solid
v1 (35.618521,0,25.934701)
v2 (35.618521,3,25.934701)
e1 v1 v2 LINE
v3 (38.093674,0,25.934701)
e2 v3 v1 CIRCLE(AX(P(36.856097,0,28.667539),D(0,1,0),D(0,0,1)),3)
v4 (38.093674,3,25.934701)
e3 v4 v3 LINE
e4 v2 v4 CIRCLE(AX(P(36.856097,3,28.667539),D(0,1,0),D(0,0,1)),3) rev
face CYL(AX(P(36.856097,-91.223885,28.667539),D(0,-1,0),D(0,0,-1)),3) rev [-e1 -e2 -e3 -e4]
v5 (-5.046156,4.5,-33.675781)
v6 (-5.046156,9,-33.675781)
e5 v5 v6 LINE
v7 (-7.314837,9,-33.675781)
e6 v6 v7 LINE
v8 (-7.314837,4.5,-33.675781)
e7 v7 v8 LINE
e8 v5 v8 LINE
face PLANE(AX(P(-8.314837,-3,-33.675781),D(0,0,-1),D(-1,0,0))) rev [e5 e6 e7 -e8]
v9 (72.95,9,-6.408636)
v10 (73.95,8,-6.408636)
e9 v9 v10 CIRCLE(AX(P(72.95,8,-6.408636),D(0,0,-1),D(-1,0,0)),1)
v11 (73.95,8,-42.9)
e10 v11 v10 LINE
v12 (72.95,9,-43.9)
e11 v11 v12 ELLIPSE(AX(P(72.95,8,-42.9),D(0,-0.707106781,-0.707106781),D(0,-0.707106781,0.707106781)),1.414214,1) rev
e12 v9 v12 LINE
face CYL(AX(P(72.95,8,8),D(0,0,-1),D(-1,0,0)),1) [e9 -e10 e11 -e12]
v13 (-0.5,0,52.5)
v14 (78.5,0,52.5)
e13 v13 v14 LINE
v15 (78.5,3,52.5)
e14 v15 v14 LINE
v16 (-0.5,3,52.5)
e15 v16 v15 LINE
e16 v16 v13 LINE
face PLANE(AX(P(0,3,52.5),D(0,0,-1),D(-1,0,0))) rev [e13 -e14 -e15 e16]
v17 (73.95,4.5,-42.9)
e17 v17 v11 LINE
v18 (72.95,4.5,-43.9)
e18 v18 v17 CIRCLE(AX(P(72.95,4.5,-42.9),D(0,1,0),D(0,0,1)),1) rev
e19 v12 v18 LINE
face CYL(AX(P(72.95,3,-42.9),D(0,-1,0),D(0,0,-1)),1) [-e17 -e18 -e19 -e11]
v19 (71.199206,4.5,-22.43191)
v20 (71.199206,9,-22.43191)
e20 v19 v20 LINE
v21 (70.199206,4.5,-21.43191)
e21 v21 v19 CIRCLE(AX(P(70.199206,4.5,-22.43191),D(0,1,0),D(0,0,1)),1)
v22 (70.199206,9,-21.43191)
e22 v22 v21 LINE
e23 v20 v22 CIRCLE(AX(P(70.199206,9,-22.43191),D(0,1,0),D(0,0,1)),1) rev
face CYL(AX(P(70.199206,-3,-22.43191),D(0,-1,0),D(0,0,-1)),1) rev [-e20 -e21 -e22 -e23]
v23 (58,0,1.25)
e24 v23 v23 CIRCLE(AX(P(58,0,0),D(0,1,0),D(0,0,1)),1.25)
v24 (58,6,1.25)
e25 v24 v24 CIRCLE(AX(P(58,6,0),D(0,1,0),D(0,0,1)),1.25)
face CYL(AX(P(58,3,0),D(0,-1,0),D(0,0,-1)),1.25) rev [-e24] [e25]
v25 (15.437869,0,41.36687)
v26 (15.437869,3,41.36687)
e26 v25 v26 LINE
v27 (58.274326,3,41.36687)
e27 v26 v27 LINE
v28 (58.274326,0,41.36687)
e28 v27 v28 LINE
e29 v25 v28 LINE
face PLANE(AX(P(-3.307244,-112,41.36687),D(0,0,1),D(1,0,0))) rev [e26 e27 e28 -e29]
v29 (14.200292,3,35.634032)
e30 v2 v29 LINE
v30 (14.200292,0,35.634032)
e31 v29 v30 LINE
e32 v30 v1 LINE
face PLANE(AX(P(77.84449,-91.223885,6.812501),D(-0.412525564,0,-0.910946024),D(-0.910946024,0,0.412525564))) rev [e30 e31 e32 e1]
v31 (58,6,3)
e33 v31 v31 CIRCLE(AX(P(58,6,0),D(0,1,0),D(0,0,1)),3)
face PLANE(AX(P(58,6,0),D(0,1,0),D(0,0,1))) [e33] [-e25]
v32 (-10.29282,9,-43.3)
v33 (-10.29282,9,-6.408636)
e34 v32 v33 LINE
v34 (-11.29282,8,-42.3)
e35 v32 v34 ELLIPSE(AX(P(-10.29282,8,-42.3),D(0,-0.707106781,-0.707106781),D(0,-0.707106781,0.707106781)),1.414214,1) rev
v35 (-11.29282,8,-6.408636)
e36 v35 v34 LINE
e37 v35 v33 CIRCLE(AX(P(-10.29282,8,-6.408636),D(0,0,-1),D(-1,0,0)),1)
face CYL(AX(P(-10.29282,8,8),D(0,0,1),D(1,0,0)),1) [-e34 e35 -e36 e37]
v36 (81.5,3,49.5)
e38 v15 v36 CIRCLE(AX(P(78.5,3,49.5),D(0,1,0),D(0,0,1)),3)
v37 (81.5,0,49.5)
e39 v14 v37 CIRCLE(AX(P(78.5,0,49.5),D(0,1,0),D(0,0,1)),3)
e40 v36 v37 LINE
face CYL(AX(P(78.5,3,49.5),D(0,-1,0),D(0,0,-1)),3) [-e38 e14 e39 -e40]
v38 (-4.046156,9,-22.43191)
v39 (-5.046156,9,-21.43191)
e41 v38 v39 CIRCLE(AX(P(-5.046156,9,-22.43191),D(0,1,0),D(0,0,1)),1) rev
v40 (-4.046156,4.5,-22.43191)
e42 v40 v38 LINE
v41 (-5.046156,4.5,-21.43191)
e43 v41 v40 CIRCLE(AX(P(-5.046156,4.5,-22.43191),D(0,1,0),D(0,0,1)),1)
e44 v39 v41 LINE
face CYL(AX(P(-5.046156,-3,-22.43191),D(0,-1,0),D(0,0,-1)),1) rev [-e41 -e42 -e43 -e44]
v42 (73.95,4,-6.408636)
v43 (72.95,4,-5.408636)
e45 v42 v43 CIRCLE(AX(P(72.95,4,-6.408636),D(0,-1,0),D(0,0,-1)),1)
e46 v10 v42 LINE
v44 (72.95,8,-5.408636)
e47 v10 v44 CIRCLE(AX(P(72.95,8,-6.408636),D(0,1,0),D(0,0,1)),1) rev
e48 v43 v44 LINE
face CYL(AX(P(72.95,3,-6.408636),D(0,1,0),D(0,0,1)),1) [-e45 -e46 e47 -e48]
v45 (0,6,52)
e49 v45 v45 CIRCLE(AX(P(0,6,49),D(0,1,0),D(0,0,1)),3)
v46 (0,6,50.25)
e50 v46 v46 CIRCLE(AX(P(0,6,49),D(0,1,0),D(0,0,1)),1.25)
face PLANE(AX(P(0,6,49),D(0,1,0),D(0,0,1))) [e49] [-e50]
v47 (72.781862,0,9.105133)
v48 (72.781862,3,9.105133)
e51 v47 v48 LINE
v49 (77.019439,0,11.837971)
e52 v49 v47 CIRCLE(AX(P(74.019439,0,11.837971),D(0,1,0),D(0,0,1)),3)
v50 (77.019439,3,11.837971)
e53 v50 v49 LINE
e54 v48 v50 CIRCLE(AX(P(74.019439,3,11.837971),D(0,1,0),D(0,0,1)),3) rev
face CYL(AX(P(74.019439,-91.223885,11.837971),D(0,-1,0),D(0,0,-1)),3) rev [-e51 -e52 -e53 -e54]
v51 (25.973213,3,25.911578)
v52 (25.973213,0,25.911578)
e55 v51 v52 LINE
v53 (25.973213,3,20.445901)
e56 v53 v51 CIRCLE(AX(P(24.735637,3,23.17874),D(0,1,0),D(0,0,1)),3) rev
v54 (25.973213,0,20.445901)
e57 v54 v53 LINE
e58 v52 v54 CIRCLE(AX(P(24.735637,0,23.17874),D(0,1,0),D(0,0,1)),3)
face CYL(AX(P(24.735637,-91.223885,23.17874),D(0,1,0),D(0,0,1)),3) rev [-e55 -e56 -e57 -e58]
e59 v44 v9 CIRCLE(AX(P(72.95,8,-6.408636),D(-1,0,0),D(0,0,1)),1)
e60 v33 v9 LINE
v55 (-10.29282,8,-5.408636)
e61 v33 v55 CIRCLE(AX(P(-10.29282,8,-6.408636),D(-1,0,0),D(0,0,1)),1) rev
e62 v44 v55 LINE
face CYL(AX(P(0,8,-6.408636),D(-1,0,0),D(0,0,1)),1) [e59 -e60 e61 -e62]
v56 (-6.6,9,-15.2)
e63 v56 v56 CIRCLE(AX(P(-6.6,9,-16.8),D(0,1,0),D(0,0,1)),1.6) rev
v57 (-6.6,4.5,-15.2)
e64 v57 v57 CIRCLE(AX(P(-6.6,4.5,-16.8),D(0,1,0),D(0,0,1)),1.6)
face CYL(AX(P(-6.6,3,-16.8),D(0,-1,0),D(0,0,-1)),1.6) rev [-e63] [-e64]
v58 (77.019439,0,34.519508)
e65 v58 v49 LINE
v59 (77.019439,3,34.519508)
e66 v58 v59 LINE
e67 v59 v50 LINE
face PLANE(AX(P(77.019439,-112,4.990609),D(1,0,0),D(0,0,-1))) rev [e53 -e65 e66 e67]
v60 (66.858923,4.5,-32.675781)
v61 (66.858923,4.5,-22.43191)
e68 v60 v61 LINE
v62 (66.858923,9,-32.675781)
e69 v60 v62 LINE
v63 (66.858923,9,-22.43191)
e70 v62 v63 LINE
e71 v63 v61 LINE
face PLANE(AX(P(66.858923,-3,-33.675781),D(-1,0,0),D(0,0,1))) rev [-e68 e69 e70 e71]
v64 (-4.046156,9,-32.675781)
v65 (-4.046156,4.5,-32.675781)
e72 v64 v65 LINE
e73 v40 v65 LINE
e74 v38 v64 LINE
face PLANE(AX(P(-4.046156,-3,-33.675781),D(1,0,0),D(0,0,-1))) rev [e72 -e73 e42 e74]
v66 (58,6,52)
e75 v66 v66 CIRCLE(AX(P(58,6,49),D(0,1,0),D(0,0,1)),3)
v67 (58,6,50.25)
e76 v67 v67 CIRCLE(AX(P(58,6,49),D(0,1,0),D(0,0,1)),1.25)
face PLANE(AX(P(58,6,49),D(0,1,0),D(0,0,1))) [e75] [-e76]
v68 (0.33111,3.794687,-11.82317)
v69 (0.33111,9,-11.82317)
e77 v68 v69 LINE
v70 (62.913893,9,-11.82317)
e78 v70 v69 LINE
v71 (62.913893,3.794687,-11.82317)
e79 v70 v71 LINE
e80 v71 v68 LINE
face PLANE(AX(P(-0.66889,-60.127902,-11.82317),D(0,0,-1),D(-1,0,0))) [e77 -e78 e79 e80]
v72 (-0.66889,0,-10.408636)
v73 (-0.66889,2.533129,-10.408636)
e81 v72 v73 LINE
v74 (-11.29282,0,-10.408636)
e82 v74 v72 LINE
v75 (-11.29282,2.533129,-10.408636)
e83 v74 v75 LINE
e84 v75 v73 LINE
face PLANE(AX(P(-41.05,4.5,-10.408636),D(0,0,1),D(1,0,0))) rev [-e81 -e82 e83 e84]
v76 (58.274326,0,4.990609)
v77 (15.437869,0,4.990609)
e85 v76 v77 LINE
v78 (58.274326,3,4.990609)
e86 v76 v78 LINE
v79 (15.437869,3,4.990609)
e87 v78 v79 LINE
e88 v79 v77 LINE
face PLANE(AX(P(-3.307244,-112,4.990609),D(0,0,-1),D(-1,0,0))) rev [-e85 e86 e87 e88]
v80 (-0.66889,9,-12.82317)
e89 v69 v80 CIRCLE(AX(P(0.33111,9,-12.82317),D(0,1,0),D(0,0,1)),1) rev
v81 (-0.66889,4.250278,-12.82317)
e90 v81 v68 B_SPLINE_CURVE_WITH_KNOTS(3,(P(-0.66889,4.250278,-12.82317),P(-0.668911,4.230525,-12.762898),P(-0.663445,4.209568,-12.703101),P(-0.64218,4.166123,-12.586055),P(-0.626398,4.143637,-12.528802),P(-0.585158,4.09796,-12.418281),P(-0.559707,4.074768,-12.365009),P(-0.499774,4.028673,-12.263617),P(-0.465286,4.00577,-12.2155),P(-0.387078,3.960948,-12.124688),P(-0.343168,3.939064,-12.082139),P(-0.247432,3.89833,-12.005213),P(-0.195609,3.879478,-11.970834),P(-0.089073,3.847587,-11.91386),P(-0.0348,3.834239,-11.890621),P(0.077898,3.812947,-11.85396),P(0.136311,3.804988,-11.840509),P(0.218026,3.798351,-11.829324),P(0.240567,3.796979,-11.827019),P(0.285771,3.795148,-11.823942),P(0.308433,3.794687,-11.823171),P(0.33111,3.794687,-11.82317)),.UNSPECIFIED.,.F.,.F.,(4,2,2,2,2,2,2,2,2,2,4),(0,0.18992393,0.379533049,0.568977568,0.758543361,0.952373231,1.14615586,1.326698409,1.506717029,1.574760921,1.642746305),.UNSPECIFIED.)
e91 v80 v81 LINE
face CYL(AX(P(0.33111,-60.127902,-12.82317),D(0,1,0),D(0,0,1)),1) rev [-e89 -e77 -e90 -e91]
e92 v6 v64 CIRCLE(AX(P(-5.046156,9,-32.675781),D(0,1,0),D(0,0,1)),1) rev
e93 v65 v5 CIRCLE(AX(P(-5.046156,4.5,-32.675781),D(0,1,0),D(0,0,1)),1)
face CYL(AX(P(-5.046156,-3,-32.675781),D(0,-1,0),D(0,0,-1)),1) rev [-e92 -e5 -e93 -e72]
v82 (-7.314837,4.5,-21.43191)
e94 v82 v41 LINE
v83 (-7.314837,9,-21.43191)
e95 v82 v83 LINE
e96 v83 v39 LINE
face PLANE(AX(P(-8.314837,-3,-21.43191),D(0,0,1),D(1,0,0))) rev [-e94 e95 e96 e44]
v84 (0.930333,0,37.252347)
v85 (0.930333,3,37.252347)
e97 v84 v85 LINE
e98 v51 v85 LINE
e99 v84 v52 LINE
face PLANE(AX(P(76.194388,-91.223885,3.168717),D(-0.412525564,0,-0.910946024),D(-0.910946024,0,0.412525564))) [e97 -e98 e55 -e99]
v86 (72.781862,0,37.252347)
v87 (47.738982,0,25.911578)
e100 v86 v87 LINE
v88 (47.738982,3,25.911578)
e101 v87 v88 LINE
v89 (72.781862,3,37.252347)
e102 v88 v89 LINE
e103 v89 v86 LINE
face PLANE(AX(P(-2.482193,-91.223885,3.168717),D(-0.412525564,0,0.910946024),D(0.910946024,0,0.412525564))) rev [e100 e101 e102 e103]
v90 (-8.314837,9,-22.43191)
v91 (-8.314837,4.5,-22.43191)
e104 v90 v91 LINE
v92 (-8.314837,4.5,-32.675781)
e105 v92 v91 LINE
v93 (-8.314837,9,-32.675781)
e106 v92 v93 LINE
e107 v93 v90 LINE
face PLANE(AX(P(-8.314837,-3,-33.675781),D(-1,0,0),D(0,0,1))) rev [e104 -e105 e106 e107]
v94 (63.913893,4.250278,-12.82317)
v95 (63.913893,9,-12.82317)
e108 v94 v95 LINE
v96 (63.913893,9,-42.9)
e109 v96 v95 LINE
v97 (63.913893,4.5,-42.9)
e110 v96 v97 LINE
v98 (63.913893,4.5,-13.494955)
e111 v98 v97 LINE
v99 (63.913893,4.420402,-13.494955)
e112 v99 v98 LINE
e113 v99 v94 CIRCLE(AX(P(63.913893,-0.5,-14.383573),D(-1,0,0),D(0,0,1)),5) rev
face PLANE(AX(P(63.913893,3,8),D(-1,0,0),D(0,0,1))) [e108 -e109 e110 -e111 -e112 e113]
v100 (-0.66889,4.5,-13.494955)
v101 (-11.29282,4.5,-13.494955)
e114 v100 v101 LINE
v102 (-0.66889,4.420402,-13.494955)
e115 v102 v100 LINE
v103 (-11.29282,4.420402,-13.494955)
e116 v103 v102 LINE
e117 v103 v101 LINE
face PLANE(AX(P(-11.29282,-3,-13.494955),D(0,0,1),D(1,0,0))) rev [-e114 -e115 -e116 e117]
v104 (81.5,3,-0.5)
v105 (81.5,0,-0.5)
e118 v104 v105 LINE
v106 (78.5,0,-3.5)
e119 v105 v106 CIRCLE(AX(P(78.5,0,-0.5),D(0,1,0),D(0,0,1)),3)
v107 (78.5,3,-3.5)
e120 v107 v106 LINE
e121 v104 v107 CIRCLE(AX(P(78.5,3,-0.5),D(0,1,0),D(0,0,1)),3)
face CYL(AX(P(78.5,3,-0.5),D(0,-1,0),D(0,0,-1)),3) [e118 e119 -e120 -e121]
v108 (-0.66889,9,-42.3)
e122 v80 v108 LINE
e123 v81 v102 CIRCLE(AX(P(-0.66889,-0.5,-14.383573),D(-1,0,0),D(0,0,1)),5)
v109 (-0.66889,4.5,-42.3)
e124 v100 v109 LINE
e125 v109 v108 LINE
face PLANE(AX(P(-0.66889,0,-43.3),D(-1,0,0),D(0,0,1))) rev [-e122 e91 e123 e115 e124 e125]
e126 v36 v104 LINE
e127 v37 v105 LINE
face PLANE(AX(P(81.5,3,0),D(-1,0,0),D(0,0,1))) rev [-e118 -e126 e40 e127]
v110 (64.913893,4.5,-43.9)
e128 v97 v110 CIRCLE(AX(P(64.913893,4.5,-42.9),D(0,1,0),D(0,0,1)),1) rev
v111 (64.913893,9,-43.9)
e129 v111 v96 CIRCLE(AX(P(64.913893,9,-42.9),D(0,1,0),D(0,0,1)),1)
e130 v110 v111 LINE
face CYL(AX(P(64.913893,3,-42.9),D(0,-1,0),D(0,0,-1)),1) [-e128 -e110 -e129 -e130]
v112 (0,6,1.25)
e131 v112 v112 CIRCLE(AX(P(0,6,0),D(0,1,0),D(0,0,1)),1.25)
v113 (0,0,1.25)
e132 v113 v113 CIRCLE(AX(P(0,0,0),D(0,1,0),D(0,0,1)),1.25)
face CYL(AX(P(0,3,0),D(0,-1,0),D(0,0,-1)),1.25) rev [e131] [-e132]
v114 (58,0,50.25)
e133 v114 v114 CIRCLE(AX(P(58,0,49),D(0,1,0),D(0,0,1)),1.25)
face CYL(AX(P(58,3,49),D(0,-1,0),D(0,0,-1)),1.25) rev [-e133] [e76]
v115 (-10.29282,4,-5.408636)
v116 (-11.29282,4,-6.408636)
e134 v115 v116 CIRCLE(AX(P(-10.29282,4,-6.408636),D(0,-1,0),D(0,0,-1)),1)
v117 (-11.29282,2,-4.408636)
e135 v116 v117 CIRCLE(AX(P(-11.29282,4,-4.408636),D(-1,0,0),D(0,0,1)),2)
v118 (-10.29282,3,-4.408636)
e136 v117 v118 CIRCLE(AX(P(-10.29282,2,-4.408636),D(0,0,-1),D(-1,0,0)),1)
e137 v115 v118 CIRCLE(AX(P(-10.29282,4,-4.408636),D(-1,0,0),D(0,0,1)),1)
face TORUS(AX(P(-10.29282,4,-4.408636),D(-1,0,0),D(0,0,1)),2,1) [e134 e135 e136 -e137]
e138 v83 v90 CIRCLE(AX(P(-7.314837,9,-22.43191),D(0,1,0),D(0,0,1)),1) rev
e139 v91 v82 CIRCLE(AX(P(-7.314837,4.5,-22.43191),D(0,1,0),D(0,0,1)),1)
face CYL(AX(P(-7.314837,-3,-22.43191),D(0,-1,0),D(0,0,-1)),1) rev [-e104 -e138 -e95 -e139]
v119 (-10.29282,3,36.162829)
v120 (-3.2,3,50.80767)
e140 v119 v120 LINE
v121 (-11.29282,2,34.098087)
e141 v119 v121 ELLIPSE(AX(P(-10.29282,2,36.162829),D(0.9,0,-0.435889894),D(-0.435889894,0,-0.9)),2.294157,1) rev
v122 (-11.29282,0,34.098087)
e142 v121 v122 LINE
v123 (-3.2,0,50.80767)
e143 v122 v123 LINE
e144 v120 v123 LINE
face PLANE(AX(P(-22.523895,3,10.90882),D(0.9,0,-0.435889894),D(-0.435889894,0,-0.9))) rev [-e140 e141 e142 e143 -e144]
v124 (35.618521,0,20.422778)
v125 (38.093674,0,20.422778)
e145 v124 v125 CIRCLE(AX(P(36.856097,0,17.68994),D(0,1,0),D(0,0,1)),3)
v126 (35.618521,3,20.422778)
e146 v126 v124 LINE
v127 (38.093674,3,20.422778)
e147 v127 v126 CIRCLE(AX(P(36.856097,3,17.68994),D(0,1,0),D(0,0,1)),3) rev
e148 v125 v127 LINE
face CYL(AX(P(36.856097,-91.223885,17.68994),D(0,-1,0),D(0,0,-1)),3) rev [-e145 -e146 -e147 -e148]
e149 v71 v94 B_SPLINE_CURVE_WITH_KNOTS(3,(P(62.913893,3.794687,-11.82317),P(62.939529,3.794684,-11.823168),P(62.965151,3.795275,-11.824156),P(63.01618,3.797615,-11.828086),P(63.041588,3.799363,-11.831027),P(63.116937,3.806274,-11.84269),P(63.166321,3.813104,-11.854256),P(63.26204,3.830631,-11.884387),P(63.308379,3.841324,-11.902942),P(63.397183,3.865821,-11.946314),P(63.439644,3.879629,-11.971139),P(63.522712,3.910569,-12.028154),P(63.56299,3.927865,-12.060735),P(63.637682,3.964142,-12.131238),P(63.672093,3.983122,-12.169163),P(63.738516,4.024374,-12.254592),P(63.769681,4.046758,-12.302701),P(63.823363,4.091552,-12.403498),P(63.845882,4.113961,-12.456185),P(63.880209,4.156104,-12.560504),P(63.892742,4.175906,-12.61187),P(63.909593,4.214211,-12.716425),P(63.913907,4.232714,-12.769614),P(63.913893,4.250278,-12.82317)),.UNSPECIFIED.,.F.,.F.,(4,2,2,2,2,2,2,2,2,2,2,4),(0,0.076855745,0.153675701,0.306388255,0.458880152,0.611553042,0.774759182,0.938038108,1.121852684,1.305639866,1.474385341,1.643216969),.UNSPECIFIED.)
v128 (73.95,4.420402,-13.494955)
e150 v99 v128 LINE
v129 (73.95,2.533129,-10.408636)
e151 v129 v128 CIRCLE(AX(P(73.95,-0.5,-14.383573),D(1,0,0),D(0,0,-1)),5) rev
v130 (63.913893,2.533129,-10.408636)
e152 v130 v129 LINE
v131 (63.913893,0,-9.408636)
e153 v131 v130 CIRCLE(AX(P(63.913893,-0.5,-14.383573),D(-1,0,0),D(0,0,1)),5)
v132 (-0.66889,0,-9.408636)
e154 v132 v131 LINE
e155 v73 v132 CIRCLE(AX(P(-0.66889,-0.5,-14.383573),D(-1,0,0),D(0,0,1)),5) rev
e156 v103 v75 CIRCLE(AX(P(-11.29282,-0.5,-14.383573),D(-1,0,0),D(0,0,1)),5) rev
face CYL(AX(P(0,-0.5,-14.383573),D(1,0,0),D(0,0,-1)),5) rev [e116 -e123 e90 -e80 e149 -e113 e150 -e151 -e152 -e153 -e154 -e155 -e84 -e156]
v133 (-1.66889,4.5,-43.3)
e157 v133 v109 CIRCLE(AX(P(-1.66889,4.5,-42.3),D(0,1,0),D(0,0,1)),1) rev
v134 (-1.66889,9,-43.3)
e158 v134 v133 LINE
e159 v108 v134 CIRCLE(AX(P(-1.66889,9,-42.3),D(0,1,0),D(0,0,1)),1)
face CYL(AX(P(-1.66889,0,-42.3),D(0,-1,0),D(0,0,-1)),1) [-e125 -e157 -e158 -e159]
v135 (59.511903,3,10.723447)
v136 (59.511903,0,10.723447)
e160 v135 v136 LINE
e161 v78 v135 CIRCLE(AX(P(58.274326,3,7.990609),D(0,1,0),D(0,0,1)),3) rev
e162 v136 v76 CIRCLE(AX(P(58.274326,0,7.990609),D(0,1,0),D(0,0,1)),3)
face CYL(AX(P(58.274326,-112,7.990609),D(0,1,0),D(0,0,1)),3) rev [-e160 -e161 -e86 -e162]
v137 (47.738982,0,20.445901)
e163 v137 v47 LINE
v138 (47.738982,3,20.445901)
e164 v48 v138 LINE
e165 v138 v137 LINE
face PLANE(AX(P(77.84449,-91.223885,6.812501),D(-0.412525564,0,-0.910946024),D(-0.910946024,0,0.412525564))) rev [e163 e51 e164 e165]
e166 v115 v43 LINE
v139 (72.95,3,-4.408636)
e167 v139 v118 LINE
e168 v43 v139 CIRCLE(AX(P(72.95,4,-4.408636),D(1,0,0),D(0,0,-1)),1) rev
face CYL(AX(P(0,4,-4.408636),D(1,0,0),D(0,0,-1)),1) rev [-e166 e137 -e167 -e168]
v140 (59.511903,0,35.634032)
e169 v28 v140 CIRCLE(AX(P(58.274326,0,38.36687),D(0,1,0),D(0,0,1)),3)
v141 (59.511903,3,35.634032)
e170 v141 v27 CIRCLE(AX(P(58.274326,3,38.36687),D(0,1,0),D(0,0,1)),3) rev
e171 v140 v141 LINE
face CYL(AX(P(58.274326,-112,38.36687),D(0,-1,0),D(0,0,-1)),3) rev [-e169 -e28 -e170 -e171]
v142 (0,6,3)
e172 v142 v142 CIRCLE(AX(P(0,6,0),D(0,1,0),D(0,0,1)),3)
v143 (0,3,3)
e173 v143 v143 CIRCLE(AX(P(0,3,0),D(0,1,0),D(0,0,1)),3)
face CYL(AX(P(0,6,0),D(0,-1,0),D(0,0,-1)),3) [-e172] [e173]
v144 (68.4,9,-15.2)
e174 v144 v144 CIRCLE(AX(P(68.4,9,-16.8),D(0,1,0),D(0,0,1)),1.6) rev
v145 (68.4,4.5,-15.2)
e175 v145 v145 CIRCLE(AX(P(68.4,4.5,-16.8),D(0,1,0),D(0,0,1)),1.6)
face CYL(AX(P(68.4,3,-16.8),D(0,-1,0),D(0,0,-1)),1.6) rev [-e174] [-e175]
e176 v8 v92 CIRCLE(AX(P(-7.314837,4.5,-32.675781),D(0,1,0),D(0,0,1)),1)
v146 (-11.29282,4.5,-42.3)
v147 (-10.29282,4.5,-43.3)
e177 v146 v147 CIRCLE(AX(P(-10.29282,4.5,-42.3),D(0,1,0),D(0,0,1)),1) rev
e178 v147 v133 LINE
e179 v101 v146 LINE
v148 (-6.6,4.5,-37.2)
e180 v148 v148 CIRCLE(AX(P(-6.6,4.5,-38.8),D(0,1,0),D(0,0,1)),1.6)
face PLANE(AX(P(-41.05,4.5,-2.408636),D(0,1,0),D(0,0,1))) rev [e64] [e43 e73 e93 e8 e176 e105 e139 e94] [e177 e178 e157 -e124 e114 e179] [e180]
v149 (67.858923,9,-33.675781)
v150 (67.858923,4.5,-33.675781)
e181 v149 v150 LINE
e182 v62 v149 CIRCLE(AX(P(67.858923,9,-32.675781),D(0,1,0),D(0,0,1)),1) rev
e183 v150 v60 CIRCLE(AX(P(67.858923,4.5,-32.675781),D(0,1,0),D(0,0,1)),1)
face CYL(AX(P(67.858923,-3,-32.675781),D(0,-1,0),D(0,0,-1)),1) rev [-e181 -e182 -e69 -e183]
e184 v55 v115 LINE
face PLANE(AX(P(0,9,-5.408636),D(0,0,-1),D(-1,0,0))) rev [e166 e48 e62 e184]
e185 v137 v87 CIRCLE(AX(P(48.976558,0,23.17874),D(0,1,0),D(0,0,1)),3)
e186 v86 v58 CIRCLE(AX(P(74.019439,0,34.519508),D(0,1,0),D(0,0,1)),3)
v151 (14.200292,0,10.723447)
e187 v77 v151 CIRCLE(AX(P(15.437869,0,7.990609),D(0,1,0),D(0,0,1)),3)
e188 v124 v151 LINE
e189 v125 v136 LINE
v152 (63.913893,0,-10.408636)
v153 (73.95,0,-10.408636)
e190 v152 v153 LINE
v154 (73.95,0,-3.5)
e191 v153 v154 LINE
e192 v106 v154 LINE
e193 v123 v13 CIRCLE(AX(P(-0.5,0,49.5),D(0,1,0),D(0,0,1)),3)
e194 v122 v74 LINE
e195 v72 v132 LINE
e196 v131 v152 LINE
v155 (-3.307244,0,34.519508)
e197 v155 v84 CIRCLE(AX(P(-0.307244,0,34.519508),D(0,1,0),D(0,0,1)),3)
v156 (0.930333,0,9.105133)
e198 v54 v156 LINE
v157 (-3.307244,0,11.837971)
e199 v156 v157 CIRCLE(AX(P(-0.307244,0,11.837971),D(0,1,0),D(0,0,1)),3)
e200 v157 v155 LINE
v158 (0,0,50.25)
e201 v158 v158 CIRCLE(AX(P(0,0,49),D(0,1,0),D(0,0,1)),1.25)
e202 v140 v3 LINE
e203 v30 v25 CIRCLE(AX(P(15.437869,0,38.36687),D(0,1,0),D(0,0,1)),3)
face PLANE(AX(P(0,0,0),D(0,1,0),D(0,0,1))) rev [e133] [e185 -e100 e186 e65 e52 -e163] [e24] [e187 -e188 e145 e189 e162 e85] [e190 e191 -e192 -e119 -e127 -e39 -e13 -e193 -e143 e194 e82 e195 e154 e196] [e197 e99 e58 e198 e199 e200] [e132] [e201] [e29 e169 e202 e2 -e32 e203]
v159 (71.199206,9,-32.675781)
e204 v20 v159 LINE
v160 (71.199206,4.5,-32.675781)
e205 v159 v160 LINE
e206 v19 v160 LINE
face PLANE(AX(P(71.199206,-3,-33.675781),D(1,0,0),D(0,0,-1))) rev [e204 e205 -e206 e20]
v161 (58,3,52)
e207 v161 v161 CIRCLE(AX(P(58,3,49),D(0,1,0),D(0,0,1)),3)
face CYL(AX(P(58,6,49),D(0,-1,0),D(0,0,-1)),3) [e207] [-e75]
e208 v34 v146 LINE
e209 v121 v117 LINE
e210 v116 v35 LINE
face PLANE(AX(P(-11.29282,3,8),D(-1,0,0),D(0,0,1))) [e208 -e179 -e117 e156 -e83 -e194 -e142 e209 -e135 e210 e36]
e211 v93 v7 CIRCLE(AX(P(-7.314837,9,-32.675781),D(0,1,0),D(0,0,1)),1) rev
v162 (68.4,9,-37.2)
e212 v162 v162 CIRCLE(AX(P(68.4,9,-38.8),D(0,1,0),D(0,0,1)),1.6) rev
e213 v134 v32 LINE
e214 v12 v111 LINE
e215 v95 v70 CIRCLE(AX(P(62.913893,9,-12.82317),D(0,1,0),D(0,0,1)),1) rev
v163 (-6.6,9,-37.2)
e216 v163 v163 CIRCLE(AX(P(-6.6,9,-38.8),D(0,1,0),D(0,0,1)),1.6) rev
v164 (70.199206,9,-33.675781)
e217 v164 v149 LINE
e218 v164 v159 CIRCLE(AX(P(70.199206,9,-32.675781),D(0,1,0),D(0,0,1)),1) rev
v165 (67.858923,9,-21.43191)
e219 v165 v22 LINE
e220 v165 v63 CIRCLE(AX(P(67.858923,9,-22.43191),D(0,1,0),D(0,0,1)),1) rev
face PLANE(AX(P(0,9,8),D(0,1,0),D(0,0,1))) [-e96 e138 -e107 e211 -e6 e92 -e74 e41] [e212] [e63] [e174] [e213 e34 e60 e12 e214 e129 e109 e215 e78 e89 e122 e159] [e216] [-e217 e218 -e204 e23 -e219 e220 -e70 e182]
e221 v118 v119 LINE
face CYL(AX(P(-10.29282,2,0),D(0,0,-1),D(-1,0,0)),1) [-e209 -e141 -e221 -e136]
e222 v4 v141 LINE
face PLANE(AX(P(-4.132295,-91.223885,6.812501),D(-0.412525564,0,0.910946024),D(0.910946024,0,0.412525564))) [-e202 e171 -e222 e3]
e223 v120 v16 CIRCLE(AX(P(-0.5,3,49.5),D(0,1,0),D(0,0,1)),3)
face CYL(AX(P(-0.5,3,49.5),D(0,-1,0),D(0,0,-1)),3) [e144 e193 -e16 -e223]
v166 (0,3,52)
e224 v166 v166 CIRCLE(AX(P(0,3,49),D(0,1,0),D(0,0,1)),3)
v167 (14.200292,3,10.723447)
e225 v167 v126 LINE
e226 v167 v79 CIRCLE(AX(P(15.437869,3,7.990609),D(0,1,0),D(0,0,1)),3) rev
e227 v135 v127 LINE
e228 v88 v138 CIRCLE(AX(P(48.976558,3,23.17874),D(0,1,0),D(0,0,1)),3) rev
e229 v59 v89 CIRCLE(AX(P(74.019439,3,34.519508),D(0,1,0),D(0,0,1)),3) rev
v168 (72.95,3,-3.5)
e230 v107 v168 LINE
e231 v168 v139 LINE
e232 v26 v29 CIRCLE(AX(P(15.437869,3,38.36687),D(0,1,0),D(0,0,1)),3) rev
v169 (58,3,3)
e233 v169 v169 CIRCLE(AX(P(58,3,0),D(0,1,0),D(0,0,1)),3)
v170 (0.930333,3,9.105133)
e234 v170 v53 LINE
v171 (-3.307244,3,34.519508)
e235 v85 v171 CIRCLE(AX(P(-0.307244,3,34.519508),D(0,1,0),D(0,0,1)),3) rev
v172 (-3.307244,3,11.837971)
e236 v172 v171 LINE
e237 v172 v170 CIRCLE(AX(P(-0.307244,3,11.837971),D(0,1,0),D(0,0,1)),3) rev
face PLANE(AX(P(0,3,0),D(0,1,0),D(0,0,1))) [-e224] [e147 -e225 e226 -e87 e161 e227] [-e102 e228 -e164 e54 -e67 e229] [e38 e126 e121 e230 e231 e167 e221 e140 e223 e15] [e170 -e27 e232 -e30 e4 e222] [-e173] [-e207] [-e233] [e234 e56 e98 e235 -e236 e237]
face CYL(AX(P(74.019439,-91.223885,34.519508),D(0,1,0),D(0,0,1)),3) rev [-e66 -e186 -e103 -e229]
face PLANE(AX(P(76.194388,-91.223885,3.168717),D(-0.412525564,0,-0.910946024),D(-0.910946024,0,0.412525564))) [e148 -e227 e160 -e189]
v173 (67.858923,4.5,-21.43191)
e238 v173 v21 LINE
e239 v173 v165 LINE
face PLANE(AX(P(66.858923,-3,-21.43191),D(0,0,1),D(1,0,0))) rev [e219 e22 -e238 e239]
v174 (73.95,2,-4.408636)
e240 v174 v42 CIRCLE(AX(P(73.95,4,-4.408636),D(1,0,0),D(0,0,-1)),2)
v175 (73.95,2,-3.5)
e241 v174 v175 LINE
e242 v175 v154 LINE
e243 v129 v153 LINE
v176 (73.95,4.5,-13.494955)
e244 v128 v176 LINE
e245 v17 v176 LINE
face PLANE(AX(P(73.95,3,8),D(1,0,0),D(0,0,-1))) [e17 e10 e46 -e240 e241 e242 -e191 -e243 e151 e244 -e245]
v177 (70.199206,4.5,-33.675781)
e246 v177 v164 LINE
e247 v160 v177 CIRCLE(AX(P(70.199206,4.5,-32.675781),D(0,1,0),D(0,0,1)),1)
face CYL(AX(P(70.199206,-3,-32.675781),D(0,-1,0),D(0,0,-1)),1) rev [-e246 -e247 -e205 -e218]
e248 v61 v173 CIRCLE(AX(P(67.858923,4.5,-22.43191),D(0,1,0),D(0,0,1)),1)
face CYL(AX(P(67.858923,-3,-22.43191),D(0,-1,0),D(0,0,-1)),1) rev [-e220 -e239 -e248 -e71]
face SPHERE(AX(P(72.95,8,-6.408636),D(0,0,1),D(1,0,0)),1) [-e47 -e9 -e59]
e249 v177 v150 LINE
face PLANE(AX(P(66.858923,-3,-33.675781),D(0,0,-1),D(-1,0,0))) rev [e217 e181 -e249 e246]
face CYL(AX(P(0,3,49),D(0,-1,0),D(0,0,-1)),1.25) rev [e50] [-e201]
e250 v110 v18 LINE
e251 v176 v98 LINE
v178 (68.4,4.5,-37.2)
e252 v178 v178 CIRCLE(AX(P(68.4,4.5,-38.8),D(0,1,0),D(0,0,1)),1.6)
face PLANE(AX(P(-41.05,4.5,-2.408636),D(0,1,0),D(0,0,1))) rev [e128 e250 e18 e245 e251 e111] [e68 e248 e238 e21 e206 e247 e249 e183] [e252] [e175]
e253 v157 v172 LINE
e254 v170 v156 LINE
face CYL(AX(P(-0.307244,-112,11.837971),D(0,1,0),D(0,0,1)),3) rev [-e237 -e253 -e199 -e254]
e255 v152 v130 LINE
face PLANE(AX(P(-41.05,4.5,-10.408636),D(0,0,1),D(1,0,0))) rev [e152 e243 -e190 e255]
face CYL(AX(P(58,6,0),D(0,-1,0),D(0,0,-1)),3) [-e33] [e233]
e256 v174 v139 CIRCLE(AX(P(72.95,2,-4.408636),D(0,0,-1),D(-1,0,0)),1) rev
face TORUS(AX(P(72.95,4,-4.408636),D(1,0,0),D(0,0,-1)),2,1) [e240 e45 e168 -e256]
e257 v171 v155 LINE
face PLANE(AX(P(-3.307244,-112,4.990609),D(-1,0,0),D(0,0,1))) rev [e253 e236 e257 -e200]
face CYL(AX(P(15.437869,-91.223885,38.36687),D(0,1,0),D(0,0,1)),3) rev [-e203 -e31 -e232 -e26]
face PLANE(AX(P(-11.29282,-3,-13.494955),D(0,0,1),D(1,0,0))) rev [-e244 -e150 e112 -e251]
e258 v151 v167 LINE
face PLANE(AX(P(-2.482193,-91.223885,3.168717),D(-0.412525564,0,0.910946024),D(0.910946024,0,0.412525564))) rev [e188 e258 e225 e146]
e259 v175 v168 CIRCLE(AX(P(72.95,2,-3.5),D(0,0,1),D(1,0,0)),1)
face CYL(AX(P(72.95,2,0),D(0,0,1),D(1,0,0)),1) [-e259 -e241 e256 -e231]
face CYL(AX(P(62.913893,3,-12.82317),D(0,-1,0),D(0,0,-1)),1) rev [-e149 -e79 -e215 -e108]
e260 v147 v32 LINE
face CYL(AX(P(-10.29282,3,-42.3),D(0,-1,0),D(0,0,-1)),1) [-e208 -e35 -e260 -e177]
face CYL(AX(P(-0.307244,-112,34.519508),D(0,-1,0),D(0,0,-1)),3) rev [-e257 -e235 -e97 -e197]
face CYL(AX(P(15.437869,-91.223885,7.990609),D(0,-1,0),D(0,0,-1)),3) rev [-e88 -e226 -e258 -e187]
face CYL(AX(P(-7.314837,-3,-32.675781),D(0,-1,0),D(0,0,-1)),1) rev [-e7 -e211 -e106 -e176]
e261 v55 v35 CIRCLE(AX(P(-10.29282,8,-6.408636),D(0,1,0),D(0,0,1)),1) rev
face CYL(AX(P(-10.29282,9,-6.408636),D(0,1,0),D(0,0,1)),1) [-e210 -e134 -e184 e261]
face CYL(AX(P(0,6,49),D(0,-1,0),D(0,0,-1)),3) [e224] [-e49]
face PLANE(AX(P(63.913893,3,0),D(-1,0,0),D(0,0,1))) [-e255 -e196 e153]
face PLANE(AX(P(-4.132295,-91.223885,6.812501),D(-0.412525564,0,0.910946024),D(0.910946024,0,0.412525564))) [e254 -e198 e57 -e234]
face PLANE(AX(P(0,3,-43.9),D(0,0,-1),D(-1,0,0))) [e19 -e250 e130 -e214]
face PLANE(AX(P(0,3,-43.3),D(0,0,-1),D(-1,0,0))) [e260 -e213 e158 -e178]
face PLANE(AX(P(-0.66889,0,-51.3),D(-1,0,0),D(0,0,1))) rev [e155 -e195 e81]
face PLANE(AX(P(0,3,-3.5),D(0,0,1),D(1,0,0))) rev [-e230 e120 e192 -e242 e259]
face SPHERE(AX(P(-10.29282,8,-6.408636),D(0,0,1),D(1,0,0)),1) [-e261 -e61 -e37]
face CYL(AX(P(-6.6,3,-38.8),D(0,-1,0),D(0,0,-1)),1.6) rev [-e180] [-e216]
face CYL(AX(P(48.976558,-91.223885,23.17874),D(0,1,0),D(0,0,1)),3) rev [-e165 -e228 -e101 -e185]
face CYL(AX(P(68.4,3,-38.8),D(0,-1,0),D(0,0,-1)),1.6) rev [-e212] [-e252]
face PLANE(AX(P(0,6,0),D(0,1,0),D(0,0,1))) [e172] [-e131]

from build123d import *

# Parameters (mm, degrees)
SKETCH1_R           = 1.25
SKETCH1_R_2         = 1.6
BOSS_EXTRUDE1_DEPTH = 3
SKETCH2_W           = 13.728592923
SKETCH2_H           = 41.891364037
CUT_EXTRUDE1_DEPTH  = 3
SKETCH3_W           = 10.623930571
SKETCH3_H           = 41.891364037
SKETCH3_R           = 1.6
SKETCH3_W_2         = 10.036107103
SKETCH3_H_2         = 42.491364037
BOSS_EXTRUDE2_DEPTH = 6
SKETCH4_W           = 41.491364037
SKETCH4_H           = 4.5
CUT_EXTRUDE2_DEPTH  = 115
SKETCH6_W           = 64.582782425
SKETCH6_H           = 2.414533823
BOSS_EXTRUDE3_DEPTH = 4.5
SKETCH7_W           = 80.326682628
SKETCH7_H           = 36.376260707
CUT_EXTRUDE3_DEPTH  = 115
EXTRUDE_THIN1_DEPTH = 3
FILLET2_R           = 3
FILLET3_R           = 1
SKETCH10_R          = 3
SKETCH10_R_2        = 1.25
BOSS_EXTRUDE4_DEPTH = 3
FILLET4_R           = 5
SKETCH13_W          = 85.242820099
SKETCH13_H          = 8
CUT_EXTRUDE5_DEPTH  = 12
SKETCH14_W          = 4.268681069
SKETCH14_H          = 12.243871332
SKETCH14_W_2        = 4.340282215
CUT_EXTRUDE6_DEPTH  = 12
FILLET5_R           = 1
FILLET6_R           = 1


with BuildPart() as part:
    # Sketch1 → Boss-Extrude1 (new body)
    # profile 1 of 4: a face of its own
    with BuildSketch(Plane(origin=(0, 0, 0), x_dir=(1, 0, 0), z_dir=(0, 1, 0))):
        with BuildLine():
            Line((-3.5, 0.5), (-3.5, -34.098087325))
            Line((-3.5, -34.098087325), (73.95, -34.098087325))
            Line((73.95, -34.098087325), (73.95, 3.5))
            Line((73.95, 3.5), (-0.5, 3.5))
            ThreePointArc((-0.5, 3.5), (-2.621320344, 2.621320344), (-3.5, 0.5))
        make_face()
        with Locations(Location((0, 0, 0), (0, 0, 270))):
            Circle(SKETCH1_R, mode=Mode.SUBTRACT)
        with Locations(Location((58, 0, 0), (0, 0, 270))):
            Circle(SKETCH1_R, mode=Mode.SUBTRACT)
    # profile 2 of 4: a face of its own
    with BuildSketch(Plane(origin=(0, 0, 0), x_dir=(1, 0, 0), z_dir=(0, 1, 0))):
        with BuildLine():
            Line((73.95, -34.098087325), (-3.5, -34.098087325))
            Line((-3.5, -34.098087325), (-3.5, -49.5))
            ThreePointArc((-3.5, -49.5), (-3.424038303, -50.170820393), (-3.2, -50.807669683))
            ThreePointArc((-3.2, -50.807669683), (-2.093265664, -52.041948962), (-0.5, -52.5))
            Line((-0.5, -52.5), (78.5, -52.5))
            ThreePointArc((78.5, -52.5), (80.621320344, -51.621320344), (81.5, -49.5))
            Line((81.5, -49.5), (81.5, 0.5))
            ThreePointArc((81.5, 0.5), (80.621320344, 2.621320344), (78.5, 3.5))
            Line((78.5, 3.5), (73.95, 3.5))
            Line((73.95, 3.5), (73.95, -34.098087325))
        make_face()
        with Locations(Location((0, -49, 0), (0, 0, 270))):
            Circle(SKETCH1_R, mode=Mode.SUBTRACT)
        with Locations(Location((58, -49, 0), (0, 0, 270))):
            Circle(SKETCH1_R, mode=Mode.SUBTRACT)
    # profile 3 of 4: a face of its own
    with BuildSketch(Plane(origin=(0, 0, 0), x_dir=(1, 0, 0), z_dir=(0, 1, 0))):
        with BuildLine():
            Line((-3.5, -34.098087325), (-11.292820099, -34.098087325))
            Line((-11.292820099, -34.098087325), (-3.2, -50.807669683))
            ThreePointArc((-3.2, -50.807669683), (-3.424038303, -50.170820393), (-3.5, -49.5))
            Line((-3.5, -49.5), (-3.5, -34.098087325))
        make_face()
    # profile 4 of 4: a face of its own
    with BuildSketch(Plane(origin=(0, 0, 0), x_dir=(1, 0, 0), z_dir=(0, 1, 0))):
        with BuildLine():
            Line((-11.292820099, 51.3), (-11.292820099, -34.098087325))
            Line((-11.292820099, -34.098087325), (-3.5, -34.098087325))
            Line((-3.5, -34.098087325), (-3.5, 0.5))
            ThreePointArc((-3.5, 0.5), (-2.621320344, 2.621320344), (-0.5, 3.5))
            Line((-0.5, 3.5), (73.95, 3.5))
            Line((73.95, 3.5), (73.95, 51.9))
            Line((73.95, 51.9), (63.913892897, 51.9))
            Line((63.913892897, 51.9), (63.913892897, 9.408635963))
            Line((63.913892897, 9.408635963), (13.059703395, 9.408635963))
            Line((13.059703395, 9.408635963), (13.059703395, 51.3))
            Line((13.059703395, 51.3), (-11.292820099, 51.3))
        make_face()
        with Locations(Location((-6.599999997, 24.800000181, 0), (0, 0, 270))):
            Circle(SKETCH1_R_2, mode=Mode.SUBTRACT)
        with Locations(Location((-6.599999997, 46.8, 0), (0, 0, 270))):
            Circle(SKETCH1_R_2, mode=Mode.SUBTRACT)
        with Locations(Location((68.4, 24.800000181, 0), (0, 0, 270))):
            Circle(SKETCH1_R_2, mode=Mode.SUBTRACT)
        with Locations(Location((68.4, 46.8, 0), (0, 0, 270))):
            Circle(SKETCH1_R_2, mode=Mode.SUBTRACT)
    extrude(amount=BOSS_EXTRUDE1_DEPTH)

    # Sketch2 → Cut-Extrude1 (cut)
    with BuildSketch(Plane(origin=(0, 3, 0), x_dir=(1, 0, 0), z_dir=(0, 1, 0))):
        with Locations((6.195406934, 30.354317982)):
            Rectangle(SKETCH2_W, SKETCH2_H)
    extrude(amount=-CUT_EXTRUDE1_DEPTH, mode=Mode.SUBTRACT)

    # Sketch3 → Boss-Extrude2 (add)
    # profile 1 of 3: a face of its own
    with BuildSketch(Plane(origin=(0, 3, 0), x_dir=(1, 0, 0), z_dir=(0, 1, 0))):
        Polygon((-11.292820099, 9.408635963), (-11.292820099, 5.408635963), (73.95, 5.408635963), (73.95, 9.408635963), (63.913892897, 9.408635963), (-0.668889528, 9.408635963), align=None)
    # profile 2 of 3: a face of its own
    with BuildSketch(Plane(origin=(0, 3, 0), x_dir=(1, 0, 0), z_dir=(0, 1, 0))):
        with Locations((-5.980854813, 30.354317982)):
            Rectangle(SKETCH3_W, SKETCH3_H)
        with Locations(Location((-6.599999997, 24.800000181, 0), (0, 0, 270))):
            Circle(SKETCH3_R, mode=Mode.SUBTRACT)
        with Locations(Location((-6.599999997, 46.8, 0), (0, 0, 270))):
            Circle(SKETCH3_R, mode=Mode.SUBTRACT)
    # profile 3 of 3: a face of its own
    with BuildSketch(Plane(origin=(0, 3, 0), x_dir=(1, 0, 0), z_dir=(0, 1, 0))):
        with Locations((68.931946448, 30.654317982)):
            Rectangle(SKETCH3_W_2, SKETCH3_H_2)
        with Locations(Location((68.4, 24.800000181, 0), (0, 0, 270))):
            Circle(SKETCH3_R, mode=Mode.SUBTRACT)
        with Locations(Location((68.4, 46.8, 0), (0, 0, 270))):
            Circle(SKETCH3_R, mode=Mode.SUBTRACT)
    extrude(amount=BOSS_EXTRUDE2_DEPTH)

    # Sketch4 → Cut-Extrude2 (cut)
    with BuildSketch(Plane(origin=(73.95, 0, 0), x_dir=(0, 0, -1), z_dir=(1, 0, 0))):
        with Locations((31.154317982, 2.25)):
            Rectangle(SKETCH4_W, SKETCH4_H)
    extrude(amount=-CUT_EXTRUDE2_DEPTH, mode=Mode.SUBTRACT)

    # Sketch6 → Boss-Extrude3 (add)
    with BuildSketch(Plane(origin=(0, 9, 0), x_dir=(1, 0, 0), z_dir=(0, 1, 0))):
        with Locations((31.622501685, 10.615902875)):
            Rectangle(SKETCH6_W, SKETCH6_H)
    extrude(amount=-BOSS_EXTRUDE3_DEPTH)

    # Sketch7 → Cut-Extrude3 (cut)
    with BuildSketch(Plane(origin=(0, 3, 0), x_dir=(1, 0, 0), z_dir=(0, 1, 0))):
        with Locations((36.856097488, -23.178739559)):
            Rectangle(SKETCH7_W, SKETCH7_H)
    extrude(amount=-CUT_EXTRUDE3_DEPTH, mode=Mode.SUBTRACT)

    # Sketch9 → Extrude-Thin1 (add)
    with BuildSketch(Plane(origin=(0, 3, 0), x_dir=(1, 0, 0), z_dir=(0, 1, 0))):
        Polygon((-4.132294954, -6.812501253), (76.194387674, -43.188761961), (77.844489931, -39.544977864), (-2.482192698, -3.168717156), align=None)
        Polygon((76.194387674, -3.168717156), (-4.132294954, -39.544977864), (-2.482192698, -43.188761961), (77.844489931, -6.812501253), align=None)
    extrude(amount=-EXTRUDE_THIN1_DEPTH)

    # Fillet2
    fillet2_edges = [part.edges().sort_by_distance(p)[0] for p in [
        (1.540940563, 1.5, 41.366869912),
        (72.171254414, 1.5, 41.366869912),
        (77.019438802, 1.5, 7.186128969),
        (77.019438802, 1.5, 39.171350148),
        (72.171254414, 1.5, 4.990609205),
        (1.540940563, 1.5, 4.990609205),
        (-3.307243826, 1.5, 39.171350148),
        (-3.307243826, 1.5, 7.186128969),
        (32.007913099, 1.5, 23.178739558),
        (36.856097488, 1.5, 20.983219794),
        (41.704281877, 1.5, 23.178739558),
        (36.856097488, 1.5, 25.374259322),
    ]]
    fillet(fillet2_edges, radius=FILLET2_R)

    # Fillet3
    fillet3_edges = [part.edges().sort_by_distance(p)[0] for p in [
        (-11.292820099, 3, 14.344725681),
        (73.95, 3, -4.454317982),
        (31.328589951, 3, -5.408635963),
        (-11.292820099, 6, -5.408635963),
        (73.95, 6, -5.408635963),
        (31.328589951, 9, -5.408635963),
    ]]
    fillet(fillet3_edges, radius=FILLET3_R)

    # Sketch10 → Boss-Extrude4 (add)
    # profile 1 of 4: a face of its own
    with BuildSketch(Plane(origin=(0, 3, 0), x_dir=(1, 0, 0), z_dir=(0, 1, 0))):
        with Locations(Location((0, 0, 0), (0, 0, 270))):
            Circle(SKETCH10_R)
        with Locations(Location((0, 0, 0), (0, 0, 270))):
            Circle(SKETCH10_R_2, mode=Mode.SUBTRACT)
    # profile 2 of 4: a face of its own
    with BuildSketch(Plane(origin=(0, 3, 0), x_dir=(1, 0, 0), z_dir=(0, 1, 0))):
        with Locations(Location((58, 0, 0), (0, 0, 270))):
            Circle(SKETCH10_R)
        with Locations(Location((58, 0, 0), (0, 0, 270))):
            Circle(SKETCH10_R_2, mode=Mode.SUBTRACT)
    # profile 3 of 4: a face of its own
    with BuildSketch(Plane(origin=(0, 3, 0), x_dir=(1, 0, 0), z_dir=(0, 1, 0))):
        with Locations(Location((0, -49, 0), (0, 0, 270))):
            Circle(SKETCH10_R)
        with Locations(Location((0, -49, 0), (0, 0, 270))):
            Circle(SKETCH10_R_2, mode=Mode.SUBTRACT)
    # profile 4 of 4: a face of its own
    with BuildSketch(Plane(origin=(0, 3, 0), x_dir=(1, 0, 0), z_dir=(0, 1, 0))):
        with Locations(Location((58, -49, 0), (0, 0, 270))):
            Circle(SKETCH10_R)
        with Locations(Location((58, -49, 0), (0, 0, 270))):
            Circle(SKETCH10_R_2, mode=Mode.SUBTRACT)
    extrude(amount=BOSS_EXTRUDE4_DEPTH)

    # Fillet4
    # the kernel refuses this fillet: 5 mm, written as the material it adds along each edge
    with BuildSketch(Plane(origin=(-13.106232491, 4.5, -9.408635963), x_dir=(0, -1, 0), z_dir=(1, 0, 0))) as fillet4_piece_1_section:
        with BuildLine():
            CenterArc((5, 4.974937186), FILLET4_R, 180, 84.260829523)
            Line((0, 4.974937186), (-0.1, 4.974937186))
            Line((-0.1, 4.974937186), (-0.1, 0))
            Line((-0.1, 0), (0, -0.1))
            ThreePointArc((0, -0.1), (2.25, -0.1), (4.49, -0.099498744))
            Line((4.49, -0.099498744), (4.5, 0))
        make_face()
    fillet4_piece_1 = extrude(amount=77.020125389, mode=Mode.PRIVATE)
    fillet4_piece_1 = split(fillet4_piece_1, bisect_by=Plane(origin=(-11.292820099, 3.269864205, -10.220188755), z_dir=(1, 0, 0)), keep=Keep.TOP, mode=Mode.PRIVATE)
    fillet4_piece_1 = split(fillet4_piece_1, bisect_by=Plane(origin=(-0.668889528, 3.269864205, -10.220188755), z_dir=(-1, 0, 0)), keep=Keep.TOP, mode=Mode.PRIVATE)
    fillet4_piece_1 = split(fillet4_piece_1, bisect_by=Plane(origin=(-5.980854813, 3.269864205, -11.823169786), z_dir=(0, 0, 1)), keep=Keep.TOP, mode=Mode.PRIVATE)
    add(fillet4_piece_1)
    with BuildSketch(Plane(origin=(-13.106232491, 4.5, -9.408635963), x_dir=(0, -1, 0), z_dir=(1, 0, 0))) as fillet4_piece_2_section:
        with BuildLine():
            CenterArc((5, 4.974937186), FILLET4_R, 180, 84.260829523)
            Line((0, 4.974937186), (-0.1, 4.974937186))
            Line((-0.1, 4.974937186), (-0.1, 0))
            Line((-0.1, 0), (0, -0.1))
            ThreePointArc((0, -0.1), (2.25, -0.1), (4.49, -0.099498744))
            Line((4.49, -0.099498744), (4.5, 0))
        make_face()
    fillet4_piece_2 = extrude(amount=77.020125389, mode=Mode.PRIVATE)
    fillet4_piece_2 = split(fillet4_piece_2, bisect_by=Plane(origin=(-11.292820099, 4.370116739, -12.651876795), z_dir=(1, 0, 0)), keep=Keep.TOP, mode=Mode.PRIVATE)
    fillet4_piece_2 = split(fillet4_piece_2, bisect_by=Plane(origin=(-0.668889528, 4.370116739, -12.651876795), z_dir=(-1, 0, 0)), keep=Keep.TOP, mode=Mode.PRIVATE)
    fillet4_piece_2 = split(fillet4_piece_2, bisect_by=Plane(origin=(-5.980854813, 4.370116739, -11.823169786), z_dir=(0, 0, -1)), keep=Keep.TOP, mode=Mode.PRIVATE)
    add(fillet4_piece_2)
    with BuildSketch(Plane(origin=(-0.668889528, 4.5, -9.408635963), x_dir=(0, -1, 0), z_dir=(1, 0, 0))) as fillet4_piece_3_section:
        with BuildLine():
            CenterArc((5, 4.974937186), FILLET4_R, 180, 84.260829523)
            Line((0, 4.974937186), (-0.1, 4.974937186))
            Line((-0.1, 4.974937186), (-0.1, 0))
            Line((-0.1, 0), (0, -0.1))
            ThreePointArc((0, -0.1), (2.25, -0.1), (4.49, -0.099498744))
            Line((4.49, -0.099498744), (4.5, 0))
        make_face()
    fillet4_piece_3 = extrude(amount=64.582782425, mode=Mode.PRIVATE)
    fillet4_piece_3 = split(fillet4_piece_3, bisect_by=Plane(origin=(31.622501685, 3.269864205, -11.823169786), z_dir=(0, 0, 1)), keep=Keep.TOP, mode=Mode.PRIVATE)
    add(fillet4_piece_3)
    with BuildSketch(Plane(origin=(-0.668889528, 4.5, -9.408635963), x_dir=(0, -1, 0), z_dir=(1, 0, 0))) as fillet4_piece_4_section:
        with BuildLine():
            CenterArc((5, 4.974937186), FILLET4_R, 180, 84.260829523)
            Line((0, 4.974937186), (-0.1, 4.974937186))
            Line((-0.1, 4.974937186), (-0.1, 0))
            Line((-0.1, 0), (0, -0.1))
            ThreePointArc((0, -0.1), (2.25, -0.1), (4.49, -0.099498744))
            Line((4.49, -0.099498744), (4.5, 0))
        make_face()
    fillet4_piece_4 = extrude(amount=77.020125389, mode=Mode.PRIVATE)
    fillet4_piece_4 = split(fillet4_piece_4, bisect_by=Plane(origin=(68.931946449, 3.269864205, -11.823169786), z_dir=(0, 0, 1)), keep=Keep.TOP, mode=Mode.PRIVATE)
    fillet4_piece_4 = split(fillet4_piece_4, bisect_by=Plane(origin=(63.913892897, 3.269864205, -10.220188755), z_dir=(1, 0, 0)), keep=Keep.TOP, mode=Mode.PRIVATE)
    fillet4_piece_4 = split(fillet4_piece_4, bisect_by=Plane(origin=(73.95, 3.269864205, -10.220188755), z_dir=(-1, 0, 0)), keep=Keep.TOP, mode=Mode.PRIVATE)
    add(fillet4_piece_4)
    with BuildSketch(Plane(origin=(-0.668889528, 4.5, -9.408635963), x_dir=(0, -1, 0), z_dir=(1, 0, 0))) as fillet4_piece_5_section:
        with BuildLine():
            CenterArc((5, 4.974937186), FILLET4_R, 180, 84.260829523)
            Line((0, 4.974937186), (-0.1, 4.974937186))
            Line((-0.1, 4.974937186), (-0.1, 0))
            Line((-0.1, 0), (0, -0.1))
            ThreePointArc((0, -0.1), (2.25, -0.1), (4.49, -0.099498744))
            Line((4.49, -0.099498744), (4.5, 0))
        make_face()
    fillet4_piece_5 = extrude(amount=77.020125389, mode=Mode.PRIVATE)
    fillet4_piece_5 = split(fillet4_piece_5, bisect_by=Plane(origin=(68.931946449, 4.370116739, -11.823169786), z_dir=(0, 0, -1)), keep=Keep.TOP, mode=Mode.PRIVATE)
    fillet4_piece_5 = split(fillet4_piece_5, bisect_by=Plane(origin=(63.913892897, 4.370116739, -12.651876795), z_dir=(1, 0, 0)), keep=Keep.TOP, mode=Mode.PRIVATE)
    fillet4_piece_5 = split(fillet4_piece_5, bisect_by=Plane(origin=(73.95, 4.370116739, -12.651876795), z_dir=(-1, 0, 0)), keep=Keep.TOP, mode=Mode.PRIVATE)
    add(fillet4_piece_5)

    # Sketch13 → Cut-Extrude5 (cut)
    with BuildSketch(Plane(origin=(0, 9, 0), x_dir=(1, 0, 0), z_dir=(0, 1, 0))):
        with Locations((31.328589951, 17.494955059)):
            Rectangle(SKETCH13_W, SKETCH13_H)
    extrude(amount=-CUT_EXTRUDE5_DEPTH, mode=Mode.SUBTRACT)


with BuildPart() as cut_extrude5_piece_1:
    # of the separate pieces the step leaves, piece 1, a body of its own (cut_extrude5_pieces)
    add(part.part.solids().sort_by_distance((73.95, 4.420402208, -13.494955059))[0])


with BuildPart() as cut_extrude5_piece_2:
    # of the separate pieces the step leaves, piece 2, a body of its own (cut_extrude5_pieces)
    add(part.part.solids().sort_by_distance((-0.668889528, 4.5, -51.3))[0])


with BuildPart() as cut_extrude5_piece_3:
    # of the separate pieces the step leaves, piece 3, a body of its own (cut_extrude5_pieces)
    add(part.part.solids().sort_by_distance((73.95, 4.5, -21.494955059))[0])


with BuildPart() as cut_extrude5_piece_2_1:
    # Body-Move/Copy1: moved
    add(cut_extrude5_piece_2.part.moved(Location((0, 0, 8))))


with BuildPart() as cut_extrude5_piece_3_1:
    # Body-Move/Copy1: moved
    add(cut_extrude5_piece_3.part.moved(Location((0, 0, 8))))


with BuildPart() as cut_extrude5_piece_2_2:
    add(cut_extrude5_piece_2_1.part)

    # Combine1: union Cut-Extrude5 piece 3, Cut-Extrude5 piece 1
    add(cut_extrude5_piece_3_1.part)
    add(cut_extrude5_piece_1.part)

    # Sketch14 → Cut-Extrude6 (cut)
    with BuildSketch(Plane(origin=(0, 9, 0), x_dir=(1, 0, 0), z_dir=(0, 1, 0))):
        with Locations((-6.180496231, 27.553845348)):
            Rectangle(SKETCH14_W, SKETCH14_H)
        with Locations((69.0290644, 27.553845348)):
            Rectangle(SKETCH14_W_2, SKETCH14_H)
    extrude(amount=-CUT_EXTRUDE6_DEPTH, mode=Mode.SUBTRACT)

    # Fillet5
    fillet5_edges = [cut_extrude5_piece_2_2.edges().sort_by_distance(p)[0] for p in [
        (-8.314836765, 6.75, -21.431909682),
        (-8.314836765, 6.75, -33.675781014),
        (-4.046155696, 6.75, -33.675781014),
        (-4.046155696, 6.75, -21.431909682),
        (66.858923292, 6.75, -21.431909682),
        (66.858923292, 6.75, -33.675781014),
        (71.199205507, 6.75, -33.675781014),
        (71.199205507, 6.75, -21.431909682),
    ]]
    fillet(fillet5_edges, radius=FILLET5_R)

    # Fillet6
    # the kernel refuses this fillet: 1 mm, written as the material it adds along each edge
    with BuildSketch(Plane(origin=(63.913892897, 1.29468679, -11.823169786), x_dir=(-1, 0, 0), z_dir=(0, 1, 0))) as fillet6_piece_1_section:
        with BuildLine():
            CenterArc((FILLET6_R, -FILLET6_R), FILLET6_R, 90, 90)
            Line((0, -FILLET6_R), (0, 0))
            Line((0, 0), (FILLET6_R, 0))
        make_face()
    fillet6_piece_1 = extrude(amount=7.70531321, mode=Mode.PRIVATE)
    fillet6_piece_1 = fillet6_piece_1 - Plane(origin=(63.684743163, -0.5, -14.383573149), x_dir=(0, -1, 0), z_dir=(-1, 0, 0)) * Cylinder(5, 20, mode=Mode.PRIVATE)
    add(fillet6_piece_1)
    with BuildSketch(Plane(origin=(-0.668889528, 1.29468679, -11.823169786), x_dir=(0, 0, -1), z_dir=(0, 1, 0))) as fillet6_piece_2_section:
        with BuildLine():
            CenterArc((FILLET6_R, -FILLET6_R), FILLET6_R, 90, 90)
            Line((0, -FILLET6_R), (0, 0))
            Line((0, 0), (FILLET6_R, 0))
        make_face()
    fillet6_piece_2 = extrude(amount=7.70531321, mode=Mode.PRIVATE)
    fillet6_piece_2 = fillet6_piece_2 - Plane(origin=(-0.439739678, -0.5, -14.383573149), x_dir=(0, -1, 0), z_dir=(-1, 0, 0)) * Cylinder(5, 20, mode=Mode.PRIVATE)
    add(fillet6_piece_2)
    # the kernel refuses this fillet: 1 mm, written as the material it takes off along each edge
    with BuildSketch(Plane(origin=(-10.292820099, 8, -6.408635963), x_dir=(0, 1, 0), z_dir=(-1, 0, 0))) as fillet6_2_piece_1_section:
        Polygon((0, 0), (FILLET6_R, 0), (FILLET6_R, -FILLET6_R), (0, -FILLET6_R), align=None)
    fillet6_2_piece_1 = extrude(amount=FILLET6_R, mode=Mode.PRIVATE)
    fillet6_2_piece_1 = fillet6_2_piece_1 - Plane(origin=(-10.292820099, 8, -6.408635963), x_dir=(0, -0.7071067811865475, -0.7071067811865475), z_dir=(-1, 0, 0)) * Sphere(FILLET6_R, mode=Mode.PRIVATE)
    add(fillet6_2_piece_1, mode=Mode.SUBTRACT)
    with BuildSketch(Plane(origin=(72.95, 8, -6.408635963), x_dir=(1, 0, 0), z_dir=(0, 1, 0))) as fillet6_2_piece_2_section:
        Polygon((0, 0), (FILLET6_R, 0), (FILLET6_R, -FILLET6_R), (0, -FILLET6_R), align=None)
    fillet6_2_piece_2 = extrude(amount=FILLET6_R, mode=Mode.PRIVATE)
    fillet6_2_piece_2 = fillet6_2_piece_2 - Plane(origin=(72.95, 8, -6.408635963), x_dir=(-0.7071067811865475, 0, -0.7071067811865475), z_dir=(0, 1, 0)) * Sphere(FILLET6_R, mode=Mode.PRIVATE)
    add(fillet6_2_piece_2, mode=Mode.SUBTRACT)
    with BuildSketch(Plane(origin=(-11.292820099, 9, -45.8), x_dir=(0, -1, 0), z_dir=(0, 0, 1))) as fillet6_2_piece_3:
        with BuildLine():
            CenterArc((FILLET6_R, FILLET6_R), FILLET6_R, 180, 90)
            Line((0, FILLET6_R), (0, 0))
            Line((0, 0), (FILLET6_R, 0))
        make_face()
    extrude(amount=39.391364037, mode=Mode.SUBTRACT)
    with BuildSketch(Plane(origin=(73.95, 2, -43.9), x_dir=(0, 0, 1), z_dir=(0, 1, 0)), Plane(origin=(-0.668889528, 2, -43.3), x_dir=(0, 0, 1), z_dir=(0, 1, 0)), Plane(origin=(63.913892897, 2, -43.9), x_dir=(1, 0, 0), z_dir=(0, 1, 0)), Plane(origin=(-11.292820099, 11.5, -43.3), x_dir=(0, 0, 1), z_dir=(0, -1, 0))) as fillet6_2_piece_4:
        with BuildLine():
            CenterArc((FILLET6_R, -FILLET6_R), FILLET6_R, 90, 90)
            Line((0, -FILLET6_R), (0, 0))
            Line((0, 0), (FILLET6_R, 0))
        make_face()
    extrude(amount=9.5, mode=Mode.SUBTRACT)
    with BuildSketch(Plane(origin=(73.95, 9, -46.4), x_dir=(-1, 0, 0), z_dir=(0, 0, 1))) as fillet6_2_piece_5:
        with BuildLine():
            CenterArc((FILLET6_R, FILLET6_R), FILLET6_R, 180, 90)
            Line((0, FILLET6_R), (0, 0))
            Line((0, 0), (FILLET6_R, 0))
        make_face()
    extrude(amount=39.991364037, mode=Mode.SUBTRACT)


solid = cut_extrude5_piece_2_2.part
